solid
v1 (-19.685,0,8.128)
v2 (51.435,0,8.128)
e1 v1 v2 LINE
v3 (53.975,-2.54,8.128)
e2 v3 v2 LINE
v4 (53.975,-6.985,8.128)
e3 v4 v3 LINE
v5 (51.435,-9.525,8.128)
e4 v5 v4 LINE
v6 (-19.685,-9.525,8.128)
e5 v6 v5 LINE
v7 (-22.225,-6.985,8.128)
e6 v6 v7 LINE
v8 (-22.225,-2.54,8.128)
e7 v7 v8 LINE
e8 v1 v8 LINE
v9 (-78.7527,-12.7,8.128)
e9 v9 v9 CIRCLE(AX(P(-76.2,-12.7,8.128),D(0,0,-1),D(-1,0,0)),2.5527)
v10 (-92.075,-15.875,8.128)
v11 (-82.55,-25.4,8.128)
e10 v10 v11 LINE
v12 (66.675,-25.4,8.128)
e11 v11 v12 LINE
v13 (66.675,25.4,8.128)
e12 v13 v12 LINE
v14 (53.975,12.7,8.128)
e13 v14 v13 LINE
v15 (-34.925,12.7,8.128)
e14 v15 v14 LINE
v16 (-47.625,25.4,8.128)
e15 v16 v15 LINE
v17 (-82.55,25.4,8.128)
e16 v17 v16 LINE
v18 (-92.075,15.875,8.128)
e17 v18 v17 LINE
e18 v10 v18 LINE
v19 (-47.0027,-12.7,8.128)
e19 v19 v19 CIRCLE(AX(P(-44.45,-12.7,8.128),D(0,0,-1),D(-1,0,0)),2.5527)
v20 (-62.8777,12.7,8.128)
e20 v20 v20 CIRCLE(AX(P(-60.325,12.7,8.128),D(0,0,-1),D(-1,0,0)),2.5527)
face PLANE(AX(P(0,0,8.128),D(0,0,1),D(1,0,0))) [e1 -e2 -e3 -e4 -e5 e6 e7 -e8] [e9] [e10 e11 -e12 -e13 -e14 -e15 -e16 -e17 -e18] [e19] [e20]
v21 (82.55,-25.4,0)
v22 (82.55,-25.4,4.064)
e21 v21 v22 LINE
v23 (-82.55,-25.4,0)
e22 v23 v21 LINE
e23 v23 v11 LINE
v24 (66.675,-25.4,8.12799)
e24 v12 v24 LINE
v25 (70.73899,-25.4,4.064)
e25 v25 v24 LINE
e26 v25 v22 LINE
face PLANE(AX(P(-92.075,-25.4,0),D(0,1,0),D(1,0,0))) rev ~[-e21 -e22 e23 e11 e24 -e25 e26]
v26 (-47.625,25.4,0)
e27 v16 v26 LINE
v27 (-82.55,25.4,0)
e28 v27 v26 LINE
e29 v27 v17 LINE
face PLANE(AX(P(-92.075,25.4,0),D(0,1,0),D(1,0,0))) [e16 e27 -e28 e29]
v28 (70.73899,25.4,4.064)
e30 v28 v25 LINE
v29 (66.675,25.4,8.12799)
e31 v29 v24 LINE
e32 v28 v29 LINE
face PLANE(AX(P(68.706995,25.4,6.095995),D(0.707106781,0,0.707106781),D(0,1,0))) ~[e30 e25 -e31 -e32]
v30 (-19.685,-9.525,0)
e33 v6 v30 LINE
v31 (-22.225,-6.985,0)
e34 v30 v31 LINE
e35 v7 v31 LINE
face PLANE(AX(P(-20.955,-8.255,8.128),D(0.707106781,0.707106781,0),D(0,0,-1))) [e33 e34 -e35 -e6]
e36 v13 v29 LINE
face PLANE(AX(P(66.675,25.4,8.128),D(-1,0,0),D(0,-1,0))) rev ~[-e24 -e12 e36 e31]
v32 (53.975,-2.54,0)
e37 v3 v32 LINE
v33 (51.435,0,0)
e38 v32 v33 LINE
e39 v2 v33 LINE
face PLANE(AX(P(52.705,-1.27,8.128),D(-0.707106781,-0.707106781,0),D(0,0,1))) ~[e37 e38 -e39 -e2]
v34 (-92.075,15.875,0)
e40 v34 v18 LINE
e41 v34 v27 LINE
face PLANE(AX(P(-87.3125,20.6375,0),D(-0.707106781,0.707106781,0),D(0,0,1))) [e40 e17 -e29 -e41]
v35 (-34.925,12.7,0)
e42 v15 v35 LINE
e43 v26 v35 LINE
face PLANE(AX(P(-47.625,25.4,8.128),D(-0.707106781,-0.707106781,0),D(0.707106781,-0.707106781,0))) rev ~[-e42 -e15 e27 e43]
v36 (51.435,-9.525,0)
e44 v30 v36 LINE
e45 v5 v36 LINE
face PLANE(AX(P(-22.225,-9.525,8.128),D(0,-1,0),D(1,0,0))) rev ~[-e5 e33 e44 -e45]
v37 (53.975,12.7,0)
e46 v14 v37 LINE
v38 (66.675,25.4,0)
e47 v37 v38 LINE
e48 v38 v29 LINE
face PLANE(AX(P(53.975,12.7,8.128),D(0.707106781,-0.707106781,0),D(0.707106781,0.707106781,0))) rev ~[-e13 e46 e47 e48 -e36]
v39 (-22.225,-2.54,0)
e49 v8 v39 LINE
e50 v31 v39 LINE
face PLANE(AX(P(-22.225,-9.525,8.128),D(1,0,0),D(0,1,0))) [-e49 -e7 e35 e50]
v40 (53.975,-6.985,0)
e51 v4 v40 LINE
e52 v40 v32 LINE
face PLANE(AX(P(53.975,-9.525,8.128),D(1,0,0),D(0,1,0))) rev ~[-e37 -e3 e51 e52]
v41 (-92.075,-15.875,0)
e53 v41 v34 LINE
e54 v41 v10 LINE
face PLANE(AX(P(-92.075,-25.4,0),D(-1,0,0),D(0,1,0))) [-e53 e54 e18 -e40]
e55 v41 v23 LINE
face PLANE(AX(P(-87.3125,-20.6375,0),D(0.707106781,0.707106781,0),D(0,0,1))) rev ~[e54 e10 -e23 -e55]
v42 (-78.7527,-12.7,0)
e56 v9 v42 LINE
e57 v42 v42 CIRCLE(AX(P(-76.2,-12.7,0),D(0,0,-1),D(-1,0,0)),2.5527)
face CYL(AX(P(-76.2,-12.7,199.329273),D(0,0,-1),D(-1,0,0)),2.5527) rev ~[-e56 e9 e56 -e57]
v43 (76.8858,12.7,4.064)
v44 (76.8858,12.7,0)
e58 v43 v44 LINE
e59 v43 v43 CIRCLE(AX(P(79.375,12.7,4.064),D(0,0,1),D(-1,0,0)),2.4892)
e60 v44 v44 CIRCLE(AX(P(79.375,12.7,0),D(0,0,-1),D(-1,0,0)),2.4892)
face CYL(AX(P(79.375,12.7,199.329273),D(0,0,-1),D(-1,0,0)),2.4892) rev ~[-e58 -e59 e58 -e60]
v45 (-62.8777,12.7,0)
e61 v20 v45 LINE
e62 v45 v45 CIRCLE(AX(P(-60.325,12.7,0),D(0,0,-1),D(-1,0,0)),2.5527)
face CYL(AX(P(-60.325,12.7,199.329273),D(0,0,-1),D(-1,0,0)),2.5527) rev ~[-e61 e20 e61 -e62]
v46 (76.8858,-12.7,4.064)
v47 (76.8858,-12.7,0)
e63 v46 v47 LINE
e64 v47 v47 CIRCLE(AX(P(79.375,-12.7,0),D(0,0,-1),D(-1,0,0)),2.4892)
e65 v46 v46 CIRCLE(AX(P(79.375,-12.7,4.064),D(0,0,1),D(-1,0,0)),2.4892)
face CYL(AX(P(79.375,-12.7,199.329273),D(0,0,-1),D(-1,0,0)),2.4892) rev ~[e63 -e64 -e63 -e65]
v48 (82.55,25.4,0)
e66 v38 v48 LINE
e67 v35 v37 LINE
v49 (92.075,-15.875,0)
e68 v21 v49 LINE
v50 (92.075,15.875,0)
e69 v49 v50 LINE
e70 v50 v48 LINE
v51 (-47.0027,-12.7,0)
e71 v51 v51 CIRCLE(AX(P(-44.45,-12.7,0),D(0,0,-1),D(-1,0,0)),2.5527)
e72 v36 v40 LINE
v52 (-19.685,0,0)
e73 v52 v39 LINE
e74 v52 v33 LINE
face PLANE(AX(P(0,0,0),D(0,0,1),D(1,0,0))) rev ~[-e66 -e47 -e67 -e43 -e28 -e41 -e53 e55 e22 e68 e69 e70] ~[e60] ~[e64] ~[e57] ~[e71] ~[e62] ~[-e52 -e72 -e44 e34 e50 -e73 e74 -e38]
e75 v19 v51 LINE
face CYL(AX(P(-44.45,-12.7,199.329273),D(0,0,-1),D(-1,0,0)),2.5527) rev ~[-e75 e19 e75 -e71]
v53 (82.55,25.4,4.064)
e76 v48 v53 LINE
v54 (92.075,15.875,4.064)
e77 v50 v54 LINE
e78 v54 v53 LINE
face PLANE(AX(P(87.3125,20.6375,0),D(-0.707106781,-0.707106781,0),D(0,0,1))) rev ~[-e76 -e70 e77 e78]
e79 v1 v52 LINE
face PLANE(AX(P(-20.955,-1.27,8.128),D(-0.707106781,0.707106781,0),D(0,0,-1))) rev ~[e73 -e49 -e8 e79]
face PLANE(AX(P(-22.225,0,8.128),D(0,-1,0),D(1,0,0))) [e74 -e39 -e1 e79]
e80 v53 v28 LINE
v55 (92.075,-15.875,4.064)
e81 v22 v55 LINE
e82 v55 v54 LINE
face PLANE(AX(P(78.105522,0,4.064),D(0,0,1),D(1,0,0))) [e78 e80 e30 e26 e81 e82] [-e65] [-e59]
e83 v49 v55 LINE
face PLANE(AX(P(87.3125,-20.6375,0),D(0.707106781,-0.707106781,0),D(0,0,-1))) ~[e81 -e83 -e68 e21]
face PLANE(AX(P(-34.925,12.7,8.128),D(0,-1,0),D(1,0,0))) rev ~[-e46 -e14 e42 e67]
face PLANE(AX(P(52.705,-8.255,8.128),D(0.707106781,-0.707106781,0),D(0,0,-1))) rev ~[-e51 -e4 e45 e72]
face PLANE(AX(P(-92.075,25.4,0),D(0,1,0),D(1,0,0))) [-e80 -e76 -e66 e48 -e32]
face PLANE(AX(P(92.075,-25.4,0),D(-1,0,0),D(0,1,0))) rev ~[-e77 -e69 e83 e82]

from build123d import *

# Parameters (mm, degrees)
F0_W      = 184.15
F0_H      = 50.8
F1_DEPTH  = 8.128
F3_D      = 5.1054
F6_D      = 4.9784
F7_W      = 76.2
F7_H      = 9.525
F8_DEPTH  = 8.129
F9_SIZE   = 9.525
F10_SIZE  = 2.54
F11_R     = 2.4892
F12_DEPTH = 4.064
F13_SIZE  = 4.06399


# Not quite as in the source:
# - a fillet or chamfer is up to 0.001 mm smaller than in the source, because OpenCascade refuses the exact size


with BuildPart() as f1:
    # F0 (on Top) → F1 (new body)
    with BuildSketch(Plane.XY):
        Rectangle(F0_W, F0_H)
    extrude(amount=F1_DEPTH)

    # F3 (through all)
    with Locations(Plane.XY.offset(8.128)):
        with Locations((-60.325, 12.7), (-76.2, -12.7), (-44.45, -12.7)):
            Hole(F3_D / 2)

    # F6 (through all)
    with Locations(Plane.XY.offset(8.128)):
        with Locations((79.375, 12.7), (79.375, -12.7)):
            Hole(F6_D / 2)

    # F7 (on face) → F8 (cut, through all)
    with BuildSketch(Plane.XY.offset(8.128)):
        Polygon((66.675, 25.4), (-47.625, 25.4), (-34.925, 12.7), (53.975, 12.7), align=None)
        with Locations((15.875, -4.7625)):
            Rectangle(F7_W, F7_H)
    extrude(amount=-F8_DEPTH, mode=Mode.SUBTRACT)

    # F9
    f9_edges = [f1.edges().sort_by_distance(p)[0] for p in [
        (-92.075, -25.4, 4.064),
        (-92.075, 25.4, 4.064),
        (92.075, -25.4, 4.064),
        (92.075, 25.4, 4.064),
    ]]
    chamfer(f9_edges, length=F9_SIZE)

    # F10
    f10_edges = [f1.edges().sort_by_distance(p)[0] for p in [
        (-22.225, 0, 4.064),
        (-22.225, -9.525, 4.064),
        (53.975, 0, 4.064),
        (53.975, -9.525, 4.064),
    ]]
    chamfer(f10_edges, length=F10_SIZE)

    # F11 (on face) → F12 (cut)
    with BuildSketch(Plane.XY.offset(8.128)):
        Polygon((82.55, 25.4), (66.675, 25.4), (66.675, -25.4), (82.55, -25.4), (92.075, -15.875), (92.075, 15.875), align=None)
        with Locations((79.375, -12.7)):
            Circle(F11_R, mode=Mode.SUBTRACT)
        with Locations((79.375, 12.7)):
            Circle(F11_R, mode=Mode.SUBTRACT)
    extrude(amount=-F12_DEPTH, mode=Mode.SUBTRACT)

    # F13 (size 4.064 in the source; OpenCascade refuses exactly that, so slightly less here)
    f13_edges = [f1.edges().sort_by_distance(p)[0] for p in [
        (66.675, 0, 4.064),
    ]]
    chamfer(f13_edges, length=F13_SIZE)


solid = f1.part
